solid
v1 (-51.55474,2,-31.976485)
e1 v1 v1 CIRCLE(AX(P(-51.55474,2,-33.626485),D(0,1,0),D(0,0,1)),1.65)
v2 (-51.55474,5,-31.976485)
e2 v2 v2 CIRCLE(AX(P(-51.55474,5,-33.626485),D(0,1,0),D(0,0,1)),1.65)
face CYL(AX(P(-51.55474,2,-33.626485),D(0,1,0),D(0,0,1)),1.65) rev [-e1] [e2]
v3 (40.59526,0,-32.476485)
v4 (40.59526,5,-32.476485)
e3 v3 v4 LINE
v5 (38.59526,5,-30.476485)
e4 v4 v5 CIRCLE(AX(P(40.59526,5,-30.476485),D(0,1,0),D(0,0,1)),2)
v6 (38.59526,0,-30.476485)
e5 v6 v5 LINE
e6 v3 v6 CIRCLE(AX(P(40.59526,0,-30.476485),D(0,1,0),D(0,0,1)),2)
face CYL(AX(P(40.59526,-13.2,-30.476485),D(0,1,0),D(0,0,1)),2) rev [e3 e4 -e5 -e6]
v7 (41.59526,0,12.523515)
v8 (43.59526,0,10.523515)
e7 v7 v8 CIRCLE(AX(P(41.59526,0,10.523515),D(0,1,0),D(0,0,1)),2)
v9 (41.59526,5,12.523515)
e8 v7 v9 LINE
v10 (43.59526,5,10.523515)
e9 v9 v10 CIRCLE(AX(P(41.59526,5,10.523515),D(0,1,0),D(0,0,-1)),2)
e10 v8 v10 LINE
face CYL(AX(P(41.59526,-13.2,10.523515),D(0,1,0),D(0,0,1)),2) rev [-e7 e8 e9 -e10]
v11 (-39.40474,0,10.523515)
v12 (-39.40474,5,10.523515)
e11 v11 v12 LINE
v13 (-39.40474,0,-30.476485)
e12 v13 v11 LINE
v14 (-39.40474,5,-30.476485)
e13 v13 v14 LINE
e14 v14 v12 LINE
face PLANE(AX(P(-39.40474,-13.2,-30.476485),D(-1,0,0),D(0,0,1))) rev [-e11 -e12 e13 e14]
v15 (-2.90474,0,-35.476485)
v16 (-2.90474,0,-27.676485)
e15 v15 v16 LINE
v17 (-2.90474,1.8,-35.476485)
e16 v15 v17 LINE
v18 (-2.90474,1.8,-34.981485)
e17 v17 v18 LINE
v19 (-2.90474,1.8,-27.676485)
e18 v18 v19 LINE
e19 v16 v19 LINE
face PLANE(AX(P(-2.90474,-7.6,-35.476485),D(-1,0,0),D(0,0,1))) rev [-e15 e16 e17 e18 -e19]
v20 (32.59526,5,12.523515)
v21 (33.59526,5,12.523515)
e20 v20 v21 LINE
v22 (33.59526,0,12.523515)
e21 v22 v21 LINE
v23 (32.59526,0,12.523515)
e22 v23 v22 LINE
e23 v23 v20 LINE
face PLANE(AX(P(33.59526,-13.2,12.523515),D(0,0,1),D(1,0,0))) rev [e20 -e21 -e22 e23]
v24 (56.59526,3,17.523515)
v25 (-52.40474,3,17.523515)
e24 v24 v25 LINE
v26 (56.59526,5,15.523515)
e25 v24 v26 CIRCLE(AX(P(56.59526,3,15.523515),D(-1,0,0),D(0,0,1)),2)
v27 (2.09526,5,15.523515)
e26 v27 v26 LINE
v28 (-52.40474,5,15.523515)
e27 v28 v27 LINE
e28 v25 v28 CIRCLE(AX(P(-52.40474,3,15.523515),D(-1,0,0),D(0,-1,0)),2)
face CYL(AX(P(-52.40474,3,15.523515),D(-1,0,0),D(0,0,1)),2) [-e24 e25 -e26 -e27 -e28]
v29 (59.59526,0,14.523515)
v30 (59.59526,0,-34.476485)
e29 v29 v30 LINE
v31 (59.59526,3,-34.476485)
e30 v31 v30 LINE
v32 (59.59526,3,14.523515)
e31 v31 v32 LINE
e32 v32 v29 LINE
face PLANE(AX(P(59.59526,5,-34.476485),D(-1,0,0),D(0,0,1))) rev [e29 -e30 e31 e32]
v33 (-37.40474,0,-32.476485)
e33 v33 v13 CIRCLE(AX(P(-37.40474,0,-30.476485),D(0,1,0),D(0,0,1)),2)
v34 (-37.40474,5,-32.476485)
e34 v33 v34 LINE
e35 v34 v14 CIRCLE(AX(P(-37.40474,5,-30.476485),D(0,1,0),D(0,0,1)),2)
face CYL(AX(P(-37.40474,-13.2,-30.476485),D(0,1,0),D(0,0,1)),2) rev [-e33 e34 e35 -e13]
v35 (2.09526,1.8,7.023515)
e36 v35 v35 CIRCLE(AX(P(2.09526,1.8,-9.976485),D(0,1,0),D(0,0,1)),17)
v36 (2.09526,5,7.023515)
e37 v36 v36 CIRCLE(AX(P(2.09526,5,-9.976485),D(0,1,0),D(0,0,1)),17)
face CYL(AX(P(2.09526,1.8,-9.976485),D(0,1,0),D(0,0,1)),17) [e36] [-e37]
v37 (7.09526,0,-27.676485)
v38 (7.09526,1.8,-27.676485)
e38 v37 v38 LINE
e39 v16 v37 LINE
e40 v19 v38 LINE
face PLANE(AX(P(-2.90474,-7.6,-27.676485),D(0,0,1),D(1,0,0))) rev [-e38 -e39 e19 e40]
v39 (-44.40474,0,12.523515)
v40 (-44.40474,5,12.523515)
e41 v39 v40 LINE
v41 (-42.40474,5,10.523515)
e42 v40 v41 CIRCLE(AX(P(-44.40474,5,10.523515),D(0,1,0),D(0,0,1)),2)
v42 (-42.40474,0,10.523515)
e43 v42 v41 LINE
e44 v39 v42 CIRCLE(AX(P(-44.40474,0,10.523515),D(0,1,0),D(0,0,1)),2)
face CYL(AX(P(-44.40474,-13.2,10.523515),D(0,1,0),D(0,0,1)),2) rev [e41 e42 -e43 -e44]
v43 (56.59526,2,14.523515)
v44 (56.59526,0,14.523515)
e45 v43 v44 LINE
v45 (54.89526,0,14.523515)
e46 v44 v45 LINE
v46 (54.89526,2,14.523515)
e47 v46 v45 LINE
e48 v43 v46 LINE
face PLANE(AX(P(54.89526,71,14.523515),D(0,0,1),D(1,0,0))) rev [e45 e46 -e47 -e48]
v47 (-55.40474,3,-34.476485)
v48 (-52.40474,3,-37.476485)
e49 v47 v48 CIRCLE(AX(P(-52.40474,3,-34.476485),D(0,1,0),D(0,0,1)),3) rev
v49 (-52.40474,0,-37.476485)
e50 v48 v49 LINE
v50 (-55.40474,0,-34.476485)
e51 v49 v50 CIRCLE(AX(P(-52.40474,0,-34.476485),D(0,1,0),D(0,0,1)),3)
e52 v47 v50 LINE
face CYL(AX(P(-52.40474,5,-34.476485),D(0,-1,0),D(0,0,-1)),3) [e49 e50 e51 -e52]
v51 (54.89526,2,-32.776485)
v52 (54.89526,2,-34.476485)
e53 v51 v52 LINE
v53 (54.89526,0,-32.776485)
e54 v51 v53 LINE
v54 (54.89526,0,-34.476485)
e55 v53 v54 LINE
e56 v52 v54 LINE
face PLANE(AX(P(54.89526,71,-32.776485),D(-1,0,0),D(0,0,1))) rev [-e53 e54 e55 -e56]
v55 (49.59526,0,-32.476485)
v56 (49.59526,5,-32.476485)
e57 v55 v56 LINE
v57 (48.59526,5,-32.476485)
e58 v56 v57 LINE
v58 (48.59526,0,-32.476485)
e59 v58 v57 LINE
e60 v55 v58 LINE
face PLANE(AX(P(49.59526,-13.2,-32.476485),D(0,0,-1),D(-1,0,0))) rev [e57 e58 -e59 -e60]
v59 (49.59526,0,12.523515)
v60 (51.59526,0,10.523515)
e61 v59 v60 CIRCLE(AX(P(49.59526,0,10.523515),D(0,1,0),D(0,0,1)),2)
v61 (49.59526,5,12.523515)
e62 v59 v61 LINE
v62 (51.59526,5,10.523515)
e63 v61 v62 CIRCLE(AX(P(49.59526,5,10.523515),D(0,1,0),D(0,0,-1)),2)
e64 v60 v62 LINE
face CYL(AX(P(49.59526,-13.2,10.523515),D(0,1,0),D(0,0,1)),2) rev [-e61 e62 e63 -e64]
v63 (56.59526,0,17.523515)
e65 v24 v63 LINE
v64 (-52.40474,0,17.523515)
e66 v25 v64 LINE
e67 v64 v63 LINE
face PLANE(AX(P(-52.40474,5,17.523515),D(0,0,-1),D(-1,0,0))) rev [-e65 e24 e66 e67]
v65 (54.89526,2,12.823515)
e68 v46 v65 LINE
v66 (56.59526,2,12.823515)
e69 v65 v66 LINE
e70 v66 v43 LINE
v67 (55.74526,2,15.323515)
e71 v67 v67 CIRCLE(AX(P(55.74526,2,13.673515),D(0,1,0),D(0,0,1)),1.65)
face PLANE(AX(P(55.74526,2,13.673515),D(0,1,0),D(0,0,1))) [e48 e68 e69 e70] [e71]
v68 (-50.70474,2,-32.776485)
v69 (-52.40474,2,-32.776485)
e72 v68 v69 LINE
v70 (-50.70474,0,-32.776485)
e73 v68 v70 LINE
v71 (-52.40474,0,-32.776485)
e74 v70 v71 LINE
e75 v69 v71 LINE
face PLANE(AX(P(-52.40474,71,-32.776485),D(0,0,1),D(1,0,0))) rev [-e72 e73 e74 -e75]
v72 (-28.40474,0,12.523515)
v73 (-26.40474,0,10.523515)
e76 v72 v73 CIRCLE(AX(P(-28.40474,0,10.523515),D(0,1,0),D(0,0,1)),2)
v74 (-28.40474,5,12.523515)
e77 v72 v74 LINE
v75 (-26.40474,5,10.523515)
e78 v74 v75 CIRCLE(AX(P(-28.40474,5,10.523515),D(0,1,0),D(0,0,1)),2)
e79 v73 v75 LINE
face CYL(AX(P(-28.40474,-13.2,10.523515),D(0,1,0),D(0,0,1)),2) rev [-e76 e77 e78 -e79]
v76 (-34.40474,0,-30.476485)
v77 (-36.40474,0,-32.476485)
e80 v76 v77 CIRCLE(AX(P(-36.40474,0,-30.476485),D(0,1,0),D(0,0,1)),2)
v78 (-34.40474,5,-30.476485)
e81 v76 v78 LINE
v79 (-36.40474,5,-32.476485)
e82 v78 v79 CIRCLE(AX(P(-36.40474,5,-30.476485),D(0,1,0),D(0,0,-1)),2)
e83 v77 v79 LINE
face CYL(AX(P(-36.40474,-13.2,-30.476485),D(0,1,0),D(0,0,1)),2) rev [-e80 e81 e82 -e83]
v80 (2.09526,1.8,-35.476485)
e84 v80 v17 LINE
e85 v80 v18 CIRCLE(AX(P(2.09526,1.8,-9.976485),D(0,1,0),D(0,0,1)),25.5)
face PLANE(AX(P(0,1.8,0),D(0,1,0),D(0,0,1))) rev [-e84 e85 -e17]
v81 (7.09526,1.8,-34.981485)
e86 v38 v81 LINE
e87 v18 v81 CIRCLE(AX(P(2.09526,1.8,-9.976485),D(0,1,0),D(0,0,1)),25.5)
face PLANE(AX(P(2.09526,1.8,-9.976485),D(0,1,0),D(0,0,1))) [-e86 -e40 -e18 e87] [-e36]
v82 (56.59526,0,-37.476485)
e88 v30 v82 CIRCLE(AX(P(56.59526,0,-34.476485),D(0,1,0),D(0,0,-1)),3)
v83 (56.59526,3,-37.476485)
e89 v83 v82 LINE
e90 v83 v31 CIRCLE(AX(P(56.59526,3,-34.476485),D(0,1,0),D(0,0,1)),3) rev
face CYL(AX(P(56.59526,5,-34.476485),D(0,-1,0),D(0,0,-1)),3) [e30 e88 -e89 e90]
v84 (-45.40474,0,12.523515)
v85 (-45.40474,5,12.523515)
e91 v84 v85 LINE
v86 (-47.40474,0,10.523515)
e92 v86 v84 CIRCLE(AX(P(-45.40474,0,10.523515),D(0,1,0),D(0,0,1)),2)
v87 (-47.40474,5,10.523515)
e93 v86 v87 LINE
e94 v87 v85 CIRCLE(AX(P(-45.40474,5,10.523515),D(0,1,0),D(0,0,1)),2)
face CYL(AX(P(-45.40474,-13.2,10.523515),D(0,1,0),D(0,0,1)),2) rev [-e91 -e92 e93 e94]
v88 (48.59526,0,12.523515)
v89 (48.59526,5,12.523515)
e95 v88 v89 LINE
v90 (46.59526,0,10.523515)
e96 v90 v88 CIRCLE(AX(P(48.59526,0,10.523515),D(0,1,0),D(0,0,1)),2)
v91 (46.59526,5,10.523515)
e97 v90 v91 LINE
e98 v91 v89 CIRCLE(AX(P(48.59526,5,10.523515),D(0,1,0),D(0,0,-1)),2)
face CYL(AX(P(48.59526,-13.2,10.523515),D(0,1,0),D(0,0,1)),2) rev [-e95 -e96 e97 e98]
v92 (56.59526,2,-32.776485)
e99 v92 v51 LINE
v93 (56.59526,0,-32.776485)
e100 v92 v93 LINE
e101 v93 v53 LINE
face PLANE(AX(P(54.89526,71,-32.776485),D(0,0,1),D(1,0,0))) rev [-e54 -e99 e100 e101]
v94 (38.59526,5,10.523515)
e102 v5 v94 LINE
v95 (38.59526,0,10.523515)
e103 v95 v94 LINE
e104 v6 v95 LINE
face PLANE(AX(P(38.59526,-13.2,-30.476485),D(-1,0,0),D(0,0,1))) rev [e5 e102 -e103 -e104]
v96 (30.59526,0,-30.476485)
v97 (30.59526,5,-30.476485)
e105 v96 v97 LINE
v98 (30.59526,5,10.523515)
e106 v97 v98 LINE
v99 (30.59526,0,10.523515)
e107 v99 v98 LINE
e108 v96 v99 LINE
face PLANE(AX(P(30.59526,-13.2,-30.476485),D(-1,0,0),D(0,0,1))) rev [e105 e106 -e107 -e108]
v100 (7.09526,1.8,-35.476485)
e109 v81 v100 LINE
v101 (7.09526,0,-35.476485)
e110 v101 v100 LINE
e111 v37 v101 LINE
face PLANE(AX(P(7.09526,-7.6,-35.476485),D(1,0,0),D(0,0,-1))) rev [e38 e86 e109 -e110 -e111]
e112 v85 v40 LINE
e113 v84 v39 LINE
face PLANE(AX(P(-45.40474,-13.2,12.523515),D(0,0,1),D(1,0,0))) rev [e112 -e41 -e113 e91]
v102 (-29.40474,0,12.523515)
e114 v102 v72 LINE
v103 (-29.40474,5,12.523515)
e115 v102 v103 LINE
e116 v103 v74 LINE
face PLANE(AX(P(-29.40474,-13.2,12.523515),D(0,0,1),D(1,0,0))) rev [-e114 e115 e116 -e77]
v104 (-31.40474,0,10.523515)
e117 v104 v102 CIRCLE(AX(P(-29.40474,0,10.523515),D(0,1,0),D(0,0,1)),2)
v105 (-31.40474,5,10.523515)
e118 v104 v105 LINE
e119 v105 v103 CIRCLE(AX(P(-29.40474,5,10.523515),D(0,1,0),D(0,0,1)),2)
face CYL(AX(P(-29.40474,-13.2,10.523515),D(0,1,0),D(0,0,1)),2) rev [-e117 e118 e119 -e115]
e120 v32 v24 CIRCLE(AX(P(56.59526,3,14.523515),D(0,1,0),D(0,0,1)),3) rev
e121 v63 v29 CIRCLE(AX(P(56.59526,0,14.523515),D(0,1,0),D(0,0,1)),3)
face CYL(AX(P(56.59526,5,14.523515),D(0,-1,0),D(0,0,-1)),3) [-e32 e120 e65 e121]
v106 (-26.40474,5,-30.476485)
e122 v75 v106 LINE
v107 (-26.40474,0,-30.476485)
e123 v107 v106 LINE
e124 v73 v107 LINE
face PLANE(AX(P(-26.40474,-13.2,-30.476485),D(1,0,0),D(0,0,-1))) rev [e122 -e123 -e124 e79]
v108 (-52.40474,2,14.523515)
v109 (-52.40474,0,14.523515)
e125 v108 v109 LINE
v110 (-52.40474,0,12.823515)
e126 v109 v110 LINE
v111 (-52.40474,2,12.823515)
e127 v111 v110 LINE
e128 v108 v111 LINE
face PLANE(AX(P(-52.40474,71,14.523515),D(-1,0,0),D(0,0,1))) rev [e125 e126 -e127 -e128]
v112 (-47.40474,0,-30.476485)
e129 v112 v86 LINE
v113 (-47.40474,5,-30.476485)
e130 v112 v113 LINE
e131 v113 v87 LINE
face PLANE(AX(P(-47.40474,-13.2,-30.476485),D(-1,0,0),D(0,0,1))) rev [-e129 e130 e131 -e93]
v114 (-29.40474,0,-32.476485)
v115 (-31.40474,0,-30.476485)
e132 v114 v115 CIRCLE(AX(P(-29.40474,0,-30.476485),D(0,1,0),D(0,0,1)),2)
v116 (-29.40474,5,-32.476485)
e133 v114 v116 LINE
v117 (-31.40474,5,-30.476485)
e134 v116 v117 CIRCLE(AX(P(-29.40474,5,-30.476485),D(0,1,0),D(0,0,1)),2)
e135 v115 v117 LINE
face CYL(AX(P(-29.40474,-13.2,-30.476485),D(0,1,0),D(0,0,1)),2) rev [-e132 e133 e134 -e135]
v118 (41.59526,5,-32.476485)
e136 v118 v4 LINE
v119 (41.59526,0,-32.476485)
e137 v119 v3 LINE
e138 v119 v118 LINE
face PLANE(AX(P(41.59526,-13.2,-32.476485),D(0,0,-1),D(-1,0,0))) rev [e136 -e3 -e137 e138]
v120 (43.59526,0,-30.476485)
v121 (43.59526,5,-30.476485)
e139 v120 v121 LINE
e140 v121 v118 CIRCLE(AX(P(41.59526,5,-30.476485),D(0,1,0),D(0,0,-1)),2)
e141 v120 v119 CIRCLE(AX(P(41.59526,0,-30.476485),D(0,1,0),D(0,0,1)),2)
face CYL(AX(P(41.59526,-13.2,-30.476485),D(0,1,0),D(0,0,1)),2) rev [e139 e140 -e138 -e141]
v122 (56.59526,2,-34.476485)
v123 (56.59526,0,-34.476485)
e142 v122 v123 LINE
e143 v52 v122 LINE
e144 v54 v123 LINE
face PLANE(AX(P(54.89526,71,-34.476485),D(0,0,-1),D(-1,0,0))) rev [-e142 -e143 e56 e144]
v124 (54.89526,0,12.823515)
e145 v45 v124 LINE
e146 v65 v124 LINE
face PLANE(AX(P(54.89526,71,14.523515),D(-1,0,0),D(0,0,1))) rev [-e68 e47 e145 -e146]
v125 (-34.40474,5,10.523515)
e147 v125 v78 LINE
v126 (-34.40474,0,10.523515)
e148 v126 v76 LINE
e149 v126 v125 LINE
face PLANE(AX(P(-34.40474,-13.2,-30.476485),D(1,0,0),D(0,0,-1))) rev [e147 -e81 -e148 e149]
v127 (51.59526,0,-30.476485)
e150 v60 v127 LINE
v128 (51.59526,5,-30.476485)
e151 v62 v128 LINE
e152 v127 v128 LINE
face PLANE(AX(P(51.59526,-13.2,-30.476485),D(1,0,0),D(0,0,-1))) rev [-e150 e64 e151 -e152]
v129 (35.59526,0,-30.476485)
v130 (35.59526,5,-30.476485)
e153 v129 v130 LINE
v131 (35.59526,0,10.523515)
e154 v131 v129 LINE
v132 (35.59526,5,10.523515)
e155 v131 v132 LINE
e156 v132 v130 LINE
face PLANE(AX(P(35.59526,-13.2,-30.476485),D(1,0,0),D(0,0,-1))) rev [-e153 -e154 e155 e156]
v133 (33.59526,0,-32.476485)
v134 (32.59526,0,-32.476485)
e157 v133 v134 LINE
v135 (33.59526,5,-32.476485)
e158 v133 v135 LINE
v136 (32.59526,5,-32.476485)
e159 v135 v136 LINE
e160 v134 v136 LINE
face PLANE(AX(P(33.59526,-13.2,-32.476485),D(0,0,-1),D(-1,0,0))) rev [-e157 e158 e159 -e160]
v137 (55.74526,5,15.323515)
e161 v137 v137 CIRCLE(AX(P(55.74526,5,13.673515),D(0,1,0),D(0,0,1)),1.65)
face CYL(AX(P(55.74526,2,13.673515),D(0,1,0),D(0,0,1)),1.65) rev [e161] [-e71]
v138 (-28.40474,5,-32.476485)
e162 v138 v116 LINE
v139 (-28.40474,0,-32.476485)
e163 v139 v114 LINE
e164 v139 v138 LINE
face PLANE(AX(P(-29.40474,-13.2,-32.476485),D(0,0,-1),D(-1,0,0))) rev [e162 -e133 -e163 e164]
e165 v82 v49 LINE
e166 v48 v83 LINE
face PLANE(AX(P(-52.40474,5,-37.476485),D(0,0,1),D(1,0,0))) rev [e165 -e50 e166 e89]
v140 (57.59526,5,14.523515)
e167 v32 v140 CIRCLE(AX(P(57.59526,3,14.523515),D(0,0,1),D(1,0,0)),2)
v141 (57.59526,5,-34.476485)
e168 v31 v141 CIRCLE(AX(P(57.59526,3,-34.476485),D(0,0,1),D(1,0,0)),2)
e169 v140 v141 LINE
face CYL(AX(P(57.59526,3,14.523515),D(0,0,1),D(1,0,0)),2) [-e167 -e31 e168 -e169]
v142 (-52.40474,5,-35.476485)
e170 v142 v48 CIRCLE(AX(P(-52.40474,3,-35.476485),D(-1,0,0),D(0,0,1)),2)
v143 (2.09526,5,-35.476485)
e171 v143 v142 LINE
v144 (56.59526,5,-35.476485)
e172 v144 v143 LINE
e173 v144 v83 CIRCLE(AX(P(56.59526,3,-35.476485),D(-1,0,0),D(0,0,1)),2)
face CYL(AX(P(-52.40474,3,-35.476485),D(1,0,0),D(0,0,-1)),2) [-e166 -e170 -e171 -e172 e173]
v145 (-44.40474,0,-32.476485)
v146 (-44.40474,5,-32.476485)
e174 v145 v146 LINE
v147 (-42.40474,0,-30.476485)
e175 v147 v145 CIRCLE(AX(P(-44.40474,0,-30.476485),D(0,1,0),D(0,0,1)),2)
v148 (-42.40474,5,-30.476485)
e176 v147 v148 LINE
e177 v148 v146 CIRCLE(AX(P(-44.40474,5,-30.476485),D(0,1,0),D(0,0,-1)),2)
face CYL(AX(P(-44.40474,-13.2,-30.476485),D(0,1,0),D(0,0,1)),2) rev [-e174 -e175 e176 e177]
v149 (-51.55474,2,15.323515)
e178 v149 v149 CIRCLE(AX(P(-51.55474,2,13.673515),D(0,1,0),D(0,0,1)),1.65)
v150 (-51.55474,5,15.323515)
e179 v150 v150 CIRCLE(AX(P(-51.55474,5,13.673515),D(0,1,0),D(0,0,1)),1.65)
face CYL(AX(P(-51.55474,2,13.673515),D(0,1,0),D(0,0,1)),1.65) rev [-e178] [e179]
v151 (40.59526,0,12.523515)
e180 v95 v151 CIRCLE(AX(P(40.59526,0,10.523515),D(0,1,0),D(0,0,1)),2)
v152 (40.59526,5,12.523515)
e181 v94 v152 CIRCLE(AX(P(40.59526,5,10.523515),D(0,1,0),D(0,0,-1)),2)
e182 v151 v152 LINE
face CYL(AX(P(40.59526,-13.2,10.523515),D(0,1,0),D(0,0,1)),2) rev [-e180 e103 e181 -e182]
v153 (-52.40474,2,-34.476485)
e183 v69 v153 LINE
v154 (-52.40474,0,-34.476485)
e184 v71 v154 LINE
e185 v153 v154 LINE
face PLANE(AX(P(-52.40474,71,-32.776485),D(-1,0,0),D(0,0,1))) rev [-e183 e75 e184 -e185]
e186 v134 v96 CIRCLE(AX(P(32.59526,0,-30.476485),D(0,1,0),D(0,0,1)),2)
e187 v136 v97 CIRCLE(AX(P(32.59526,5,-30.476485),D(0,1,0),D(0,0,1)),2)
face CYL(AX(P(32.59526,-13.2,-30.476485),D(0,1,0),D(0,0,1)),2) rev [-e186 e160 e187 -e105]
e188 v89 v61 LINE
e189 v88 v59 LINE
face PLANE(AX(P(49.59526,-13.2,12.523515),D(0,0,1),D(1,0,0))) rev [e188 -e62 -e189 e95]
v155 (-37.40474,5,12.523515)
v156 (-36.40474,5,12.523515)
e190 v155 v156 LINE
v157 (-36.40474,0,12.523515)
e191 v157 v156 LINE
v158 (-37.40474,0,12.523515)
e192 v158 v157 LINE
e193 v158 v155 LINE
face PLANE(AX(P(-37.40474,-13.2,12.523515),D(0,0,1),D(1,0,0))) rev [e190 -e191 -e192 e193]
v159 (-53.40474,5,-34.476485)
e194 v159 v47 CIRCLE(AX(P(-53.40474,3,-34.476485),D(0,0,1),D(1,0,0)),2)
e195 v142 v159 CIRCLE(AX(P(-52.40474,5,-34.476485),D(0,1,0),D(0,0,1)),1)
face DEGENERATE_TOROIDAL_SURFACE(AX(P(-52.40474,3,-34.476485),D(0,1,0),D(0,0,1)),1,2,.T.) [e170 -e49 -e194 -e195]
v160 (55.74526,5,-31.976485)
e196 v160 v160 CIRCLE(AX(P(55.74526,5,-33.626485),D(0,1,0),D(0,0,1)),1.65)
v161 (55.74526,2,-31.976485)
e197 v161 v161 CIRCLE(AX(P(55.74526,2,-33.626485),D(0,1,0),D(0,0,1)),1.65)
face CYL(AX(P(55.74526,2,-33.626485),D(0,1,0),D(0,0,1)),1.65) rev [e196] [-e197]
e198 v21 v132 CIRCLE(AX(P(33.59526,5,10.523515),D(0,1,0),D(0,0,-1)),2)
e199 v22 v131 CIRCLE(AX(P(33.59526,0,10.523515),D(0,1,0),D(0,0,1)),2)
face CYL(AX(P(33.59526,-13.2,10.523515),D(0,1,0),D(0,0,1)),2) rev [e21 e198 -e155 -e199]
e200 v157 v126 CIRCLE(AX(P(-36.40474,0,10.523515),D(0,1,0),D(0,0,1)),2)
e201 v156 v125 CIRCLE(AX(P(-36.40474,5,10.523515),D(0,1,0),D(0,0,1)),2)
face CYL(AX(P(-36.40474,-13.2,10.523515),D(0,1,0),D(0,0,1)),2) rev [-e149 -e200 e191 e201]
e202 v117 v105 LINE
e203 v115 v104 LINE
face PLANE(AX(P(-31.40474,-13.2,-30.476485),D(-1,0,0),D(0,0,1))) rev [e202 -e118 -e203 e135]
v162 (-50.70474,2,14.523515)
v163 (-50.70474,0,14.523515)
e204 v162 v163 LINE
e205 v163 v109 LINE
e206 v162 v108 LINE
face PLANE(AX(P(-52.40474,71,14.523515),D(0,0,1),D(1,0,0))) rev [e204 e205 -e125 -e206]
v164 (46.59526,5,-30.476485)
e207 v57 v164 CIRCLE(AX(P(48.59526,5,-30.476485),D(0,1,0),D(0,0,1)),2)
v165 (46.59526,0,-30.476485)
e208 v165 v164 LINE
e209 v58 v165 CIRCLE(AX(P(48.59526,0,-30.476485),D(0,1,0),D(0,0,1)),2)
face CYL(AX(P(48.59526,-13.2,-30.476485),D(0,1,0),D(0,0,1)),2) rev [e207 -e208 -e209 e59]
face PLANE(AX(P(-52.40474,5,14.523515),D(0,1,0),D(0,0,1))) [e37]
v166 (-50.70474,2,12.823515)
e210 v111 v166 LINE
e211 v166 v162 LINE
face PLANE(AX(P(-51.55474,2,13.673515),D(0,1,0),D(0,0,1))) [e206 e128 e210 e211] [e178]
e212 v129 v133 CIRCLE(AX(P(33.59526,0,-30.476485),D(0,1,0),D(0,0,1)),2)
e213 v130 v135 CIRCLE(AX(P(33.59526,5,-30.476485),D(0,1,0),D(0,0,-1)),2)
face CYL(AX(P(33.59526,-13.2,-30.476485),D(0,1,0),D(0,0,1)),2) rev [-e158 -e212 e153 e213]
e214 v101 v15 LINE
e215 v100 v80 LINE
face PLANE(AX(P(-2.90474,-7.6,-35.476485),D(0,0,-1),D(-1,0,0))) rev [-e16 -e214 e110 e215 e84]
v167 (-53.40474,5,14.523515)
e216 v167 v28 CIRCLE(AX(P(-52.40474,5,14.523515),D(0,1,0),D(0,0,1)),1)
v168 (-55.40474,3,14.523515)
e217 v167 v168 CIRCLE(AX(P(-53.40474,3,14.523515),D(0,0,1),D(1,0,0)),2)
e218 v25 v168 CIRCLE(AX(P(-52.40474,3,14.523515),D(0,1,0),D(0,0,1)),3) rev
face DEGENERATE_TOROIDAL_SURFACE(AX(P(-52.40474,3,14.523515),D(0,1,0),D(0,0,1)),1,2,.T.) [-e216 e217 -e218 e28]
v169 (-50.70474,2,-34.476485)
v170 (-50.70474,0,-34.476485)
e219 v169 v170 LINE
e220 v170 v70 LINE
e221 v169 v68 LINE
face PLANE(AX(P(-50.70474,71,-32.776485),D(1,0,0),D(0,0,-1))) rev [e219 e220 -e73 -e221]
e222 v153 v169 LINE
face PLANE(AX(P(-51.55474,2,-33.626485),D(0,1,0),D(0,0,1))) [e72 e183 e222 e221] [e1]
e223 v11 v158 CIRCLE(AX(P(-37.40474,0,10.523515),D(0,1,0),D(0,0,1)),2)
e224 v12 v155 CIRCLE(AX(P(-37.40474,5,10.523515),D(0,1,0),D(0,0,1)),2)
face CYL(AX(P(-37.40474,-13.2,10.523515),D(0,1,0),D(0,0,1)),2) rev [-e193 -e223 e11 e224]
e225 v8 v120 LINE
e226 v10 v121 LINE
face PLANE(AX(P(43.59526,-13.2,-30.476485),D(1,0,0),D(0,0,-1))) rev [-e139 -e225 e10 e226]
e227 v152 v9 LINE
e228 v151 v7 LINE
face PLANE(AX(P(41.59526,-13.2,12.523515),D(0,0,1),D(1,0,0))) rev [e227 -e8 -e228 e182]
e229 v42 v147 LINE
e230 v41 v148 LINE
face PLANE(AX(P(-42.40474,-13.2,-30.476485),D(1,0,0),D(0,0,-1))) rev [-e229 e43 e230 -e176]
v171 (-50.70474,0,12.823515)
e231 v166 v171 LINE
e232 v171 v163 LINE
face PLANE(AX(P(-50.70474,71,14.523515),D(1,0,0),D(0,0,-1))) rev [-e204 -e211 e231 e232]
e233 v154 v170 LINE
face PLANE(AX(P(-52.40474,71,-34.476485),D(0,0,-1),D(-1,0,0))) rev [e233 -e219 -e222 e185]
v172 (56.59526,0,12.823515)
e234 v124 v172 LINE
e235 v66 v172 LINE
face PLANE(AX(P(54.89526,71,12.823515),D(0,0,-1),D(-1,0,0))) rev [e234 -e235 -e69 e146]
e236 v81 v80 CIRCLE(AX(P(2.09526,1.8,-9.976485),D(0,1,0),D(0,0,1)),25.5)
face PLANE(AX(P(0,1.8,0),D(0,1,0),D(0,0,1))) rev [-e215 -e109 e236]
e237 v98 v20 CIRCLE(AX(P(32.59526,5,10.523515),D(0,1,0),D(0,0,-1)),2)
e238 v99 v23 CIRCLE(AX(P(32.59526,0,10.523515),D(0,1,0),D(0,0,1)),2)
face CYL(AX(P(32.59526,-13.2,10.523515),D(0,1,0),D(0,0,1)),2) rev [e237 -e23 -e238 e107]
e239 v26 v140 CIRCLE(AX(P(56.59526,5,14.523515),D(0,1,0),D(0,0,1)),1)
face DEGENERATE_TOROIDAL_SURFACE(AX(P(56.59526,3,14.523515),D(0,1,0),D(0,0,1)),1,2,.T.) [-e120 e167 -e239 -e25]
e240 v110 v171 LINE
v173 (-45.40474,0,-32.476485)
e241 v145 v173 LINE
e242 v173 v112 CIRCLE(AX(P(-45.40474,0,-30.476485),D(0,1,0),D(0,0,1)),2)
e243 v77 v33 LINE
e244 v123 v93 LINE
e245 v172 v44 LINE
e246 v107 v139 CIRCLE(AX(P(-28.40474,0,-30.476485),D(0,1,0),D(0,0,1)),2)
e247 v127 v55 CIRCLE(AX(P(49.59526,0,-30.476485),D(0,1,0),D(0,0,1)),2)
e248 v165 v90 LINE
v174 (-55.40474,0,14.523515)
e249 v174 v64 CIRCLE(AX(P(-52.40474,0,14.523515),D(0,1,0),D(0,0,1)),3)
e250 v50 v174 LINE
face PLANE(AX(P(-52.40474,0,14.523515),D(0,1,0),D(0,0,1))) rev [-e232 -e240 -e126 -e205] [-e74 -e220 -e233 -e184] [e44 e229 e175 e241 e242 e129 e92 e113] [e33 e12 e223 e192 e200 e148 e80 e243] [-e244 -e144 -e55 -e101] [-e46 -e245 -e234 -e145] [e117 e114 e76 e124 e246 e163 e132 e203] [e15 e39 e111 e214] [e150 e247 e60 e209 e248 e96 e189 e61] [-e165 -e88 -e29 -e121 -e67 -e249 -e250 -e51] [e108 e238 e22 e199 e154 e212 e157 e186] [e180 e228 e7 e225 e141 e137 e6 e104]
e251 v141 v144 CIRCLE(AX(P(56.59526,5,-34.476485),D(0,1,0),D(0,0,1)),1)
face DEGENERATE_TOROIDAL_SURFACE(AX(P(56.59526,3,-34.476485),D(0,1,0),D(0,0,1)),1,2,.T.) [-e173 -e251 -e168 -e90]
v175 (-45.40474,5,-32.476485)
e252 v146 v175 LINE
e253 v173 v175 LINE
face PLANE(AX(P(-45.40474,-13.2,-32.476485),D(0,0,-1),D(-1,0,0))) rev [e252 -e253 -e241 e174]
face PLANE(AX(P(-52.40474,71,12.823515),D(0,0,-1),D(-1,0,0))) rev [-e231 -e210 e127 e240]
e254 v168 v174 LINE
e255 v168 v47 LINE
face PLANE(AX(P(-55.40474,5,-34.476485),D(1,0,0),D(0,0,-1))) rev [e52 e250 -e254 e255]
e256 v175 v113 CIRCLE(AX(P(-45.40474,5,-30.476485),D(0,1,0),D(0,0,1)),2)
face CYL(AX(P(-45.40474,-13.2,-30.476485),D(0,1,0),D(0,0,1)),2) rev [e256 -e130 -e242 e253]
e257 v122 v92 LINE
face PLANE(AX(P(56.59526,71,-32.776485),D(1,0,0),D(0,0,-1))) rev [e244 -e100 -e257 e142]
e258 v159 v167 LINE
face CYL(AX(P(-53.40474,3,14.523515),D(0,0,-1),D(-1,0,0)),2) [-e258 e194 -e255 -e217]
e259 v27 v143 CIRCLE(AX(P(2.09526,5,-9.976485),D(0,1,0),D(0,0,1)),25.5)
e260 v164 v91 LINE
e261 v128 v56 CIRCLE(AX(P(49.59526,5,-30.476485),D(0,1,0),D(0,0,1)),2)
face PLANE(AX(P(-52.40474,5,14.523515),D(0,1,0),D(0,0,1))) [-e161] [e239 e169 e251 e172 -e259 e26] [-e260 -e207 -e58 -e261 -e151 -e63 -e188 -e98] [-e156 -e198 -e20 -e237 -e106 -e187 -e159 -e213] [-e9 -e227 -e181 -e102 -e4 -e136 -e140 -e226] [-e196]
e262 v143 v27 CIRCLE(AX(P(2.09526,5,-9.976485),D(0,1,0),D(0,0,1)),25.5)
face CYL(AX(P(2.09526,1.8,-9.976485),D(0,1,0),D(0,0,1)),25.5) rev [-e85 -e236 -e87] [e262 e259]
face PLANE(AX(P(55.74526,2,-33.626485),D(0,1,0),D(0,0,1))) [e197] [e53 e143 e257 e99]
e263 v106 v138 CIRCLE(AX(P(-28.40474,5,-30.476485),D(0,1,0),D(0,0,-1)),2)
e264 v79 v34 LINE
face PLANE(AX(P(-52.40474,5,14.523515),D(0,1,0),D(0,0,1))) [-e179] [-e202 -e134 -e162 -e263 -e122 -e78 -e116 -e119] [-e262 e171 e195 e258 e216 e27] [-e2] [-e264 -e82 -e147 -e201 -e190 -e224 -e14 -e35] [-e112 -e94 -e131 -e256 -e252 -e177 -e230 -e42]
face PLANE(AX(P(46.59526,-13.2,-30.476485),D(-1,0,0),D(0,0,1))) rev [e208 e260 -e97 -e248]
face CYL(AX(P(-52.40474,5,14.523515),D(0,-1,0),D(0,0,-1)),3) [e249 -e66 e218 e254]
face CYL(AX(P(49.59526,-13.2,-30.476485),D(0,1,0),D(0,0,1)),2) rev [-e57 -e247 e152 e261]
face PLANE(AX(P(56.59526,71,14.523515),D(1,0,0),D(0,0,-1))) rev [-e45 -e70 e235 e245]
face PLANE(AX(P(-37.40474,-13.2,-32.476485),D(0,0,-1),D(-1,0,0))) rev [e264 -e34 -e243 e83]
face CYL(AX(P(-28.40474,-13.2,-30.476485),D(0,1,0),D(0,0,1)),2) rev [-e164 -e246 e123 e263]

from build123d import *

# Parameters (mm, degrees)
EXTRUDE_1_DEPTH     = 5
SKETCH_2_R          = 25.5
SKETCH_2_R_2        = 17
CUT_EXTRUDE_1_DEPTH = 3.2
CUT_EXTRUDE_2_DEPTH = 18.2
FILLET_1_R          = 2
SKETCH_4_W          = 1.7
SKETCH_4_H          = 1.7
CUT_EXTRUDE_3_DEPTH = 71
SKETCH_5_R          = 1.65
CUT_EXTRUDE_4_DEPTH = 3
SKETCH_6_W          = 10
SKETCH_6_H          = 7.8
CUT_EXTRUDE_5_DEPTH = 9.4


with BuildPart() as part:
    # Эскиз1 → Бобышка-Вытянуть1 (new body)
    with BuildSketch(Plane(origin=(0, 0, 0), x_dir=(1, 0, 0), z_dir=(0, 1, 0))):
        with BuildLine():
            Line((-52.404740413, 37.47648532), (56.595259587, 37.47648532))
            ThreePointArc((56.595259587, 37.47648532), (58.716579931, 36.597805664), (59.595259587, 34.47648532))
            Line((59.595259587, 34.47648532), (59.595259587, -14.52351468))
            ThreePointArc((59.595259587, -14.52351468), (58.716579931, -16.644835023), (56.595259587, -17.52351468))
            Line((56.595259587, -17.52351468), (-52.404740413, -17.52351468))
            ThreePointArc((-52.404740413, -17.52351468), (-54.526060756, -16.644835023), (-55.404740413, -14.52351468))
            Line((-55.404740413, -14.52351468), (-55.404740413, 34.47648532))
            ThreePointArc((-55.404740413, 34.47648532), (-54.526060756, 36.597805664), (-52.404740413, 37.47648532))
        make_face()
    extrude(amount=EXTRUDE_1_DEPTH)

    # Эскиз2 → Вырез-Вытянуть1 (cut)
    with BuildSketch(Plane(origin=(0, 5, 0), x_dir=(1, 0, 0), z_dir=(0, 1, 0))):
        with Locations(Location((2.095259587, 9.97648532, 0), (0, 0, 270))):
            Circle(SKETCH_2_R)
        with Locations(Location((2.095259587, 9.97648532, 0), (0, 0, 270))):
            Circle(SKETCH_2_R_2, mode=Mode.SUBTRACT)
    extrude(amount=-CUT_EXTRUDE_1_DEPTH, mode=Mode.SUBTRACT)

    # Эскиз3 → Вырез-Вытянуть2 (cut)
    with BuildSketch(Plane(origin=(0, 5, 0), x_dir=(1, 0, 0), z_dir=(0, 1, 0))):
        with BuildLine():
            Line((-45.404740413, 32.47648532), (-44.404740413, 32.47648532))
            ThreePointArc((-44.404740413, 32.47648532), (-42.99052685, 31.890698883), (-42.404740413, 30.47648532))
            Line((-42.404740413, 30.47648532), (-42.404740413, -10.52351468))
            ThreePointArc((-42.404740413, -10.52351468), (-42.99052685, -11.937728242), (-44.404740413, -12.52351468))
            Line((-44.404740413, -12.52351468), (-45.404740413, -12.52351468))
            ThreePointArc((-45.404740413, -12.52351468), (-46.818953975, -11.937728242), (-47.404740413, -10.52351468))
            Line((-47.404740413, -10.52351468), (-47.404740413, 30.47648532))
            ThreePointArc((-47.404740413, 30.47648532), (-46.818953975, 31.890698883), (-45.404740413, 32.47648532))
        make_face()
        with BuildLine():
            Line((-37.404740413, 32.47648532), (-36.404740413, 32.47648532))
            ThreePointArc((-36.404740413, 32.47648532), (-34.99052685, 31.890698883), (-34.404740413, 30.47648532))
            Line((-34.404740413, 30.47648532), (-34.404740413, -10.52351468))
            ThreePointArc((-34.404740413, -10.52351468), (-34.99052685, -11.937728242), (-36.404740413, -12.52351468))
            Line((-36.404740413, -12.52351468), (-37.404740413, -12.52351468))
            ThreePointArc((-37.404740413, -12.52351468), (-38.818953975, -11.937728242), (-39.404740413, -10.52351468))
            Line((-39.404740413, -10.52351468), (-39.404740413, 30.47648532))
            ThreePointArc((-39.404740413, 30.47648532), (-38.818953975, 31.890698883), (-37.404740413, 32.47648532))
        make_face()
        with BuildLine():
            Line((-29.404740413, 32.47648532), (-28.404740413, 32.47648532))
            ThreePointArc((-28.404740413, 32.47648532), (-26.99052685, 31.890698883), (-26.404740413, 30.47648532))
            Line((-26.404740413, 30.47648532), (-26.404740413, -10.52351468))
            ThreePointArc((-26.404740413, -10.52351468), (-26.99052685, -11.937728242), (-28.404740413, -12.52351468))
            Line((-28.404740413, -12.52351468), (-29.404740413, -12.52351468))
            ThreePointArc((-29.404740413, -12.52351468), (-30.818953975, -11.937728242), (-31.404740413, -10.52351468))
            Line((-31.404740413, -10.52351468), (-31.404740413, 30.47648532))
            ThreePointArc((-31.404740413, 30.47648532), (-30.818953975, 31.890698883), (-29.404740413, 32.47648532))
        make_face()
        with BuildLine():
            Line((49.595259587, 32.47648532), (48.595259587, 32.47648532))
            ThreePointArc((48.595259587, 32.47648532), (47.181046025, 31.890698883), (46.595259587, 30.47648532))
            Line((46.595259587, 30.47648532), (46.595259587, -10.52351468))
            ThreePointArc((46.595259587, -10.52351468), (47.181046025, -11.937728242), (48.595259587, -12.52351468))
            Line((48.595259587, -12.52351468), (49.595259587, -12.52351468))
            ThreePointArc((49.595259587, -12.52351468), (51.00947315, -11.937728242), (51.595259587, -10.52351468))
            Line((51.595259587, -10.52351468), (51.595259587, 30.47648532))
            ThreePointArc((51.595259587, 30.47648532), (51.00947315, 31.890698883), (49.595259587, 32.47648532))
        make_face()
        with BuildLine():
            Line((41.595259587, 32.47648532), (40.595259587, 32.47648532))
            ThreePointArc((40.595259587, 32.47648532), (39.181046025, 31.890698883), (38.595259587, 30.47648532))
            Line((38.595259587, 30.47648532), (38.595259587, -10.52351468))
            ThreePointArc((38.595259587, -10.52351468), (39.181046025, -11.937728242), (40.595259587, -12.52351468))
            Line((40.595259587, -12.52351468), (41.595259587, -12.52351468))
            ThreePointArc((41.595259587, -12.52351468), (43.00947315, -11.937728242), (43.595259587, -10.52351468))
            Line((43.595259587, -10.52351468), (43.595259587, 30.47648532))
            ThreePointArc((43.595259587, 30.47648532), (43.00947315, 31.890698883), (41.595259587, 32.47648532))
        make_face()
        with BuildLine():
            Line((33.595259587, 32.47648532), (32.595259587, 32.47648532))
            ThreePointArc((32.595259587, 32.47648532), (31.181046025, 31.890698883), (30.595259587, 30.47648532))
            Line((30.595259587, 30.47648532), (30.595259587, -10.52351468))
            ThreePointArc((30.595259587, -10.52351468), (31.181046025, -11.937728242), (32.595259587, -12.52351468))
            Line((32.595259587, -12.52351468), (33.595259587, -12.52351468))
            ThreePointArc((33.595259587, -12.52351468), (35.00947315, -11.937728242), (35.595259587, -10.52351468))
            Line((35.595259587, -10.52351468), (35.595259587, 30.47648532))
            ThreePointArc((35.595259587, 30.47648532), (35.00947315, 31.890698883), (33.595259587, 32.47648532))
        make_face()
    extrude(amount=-CUT_EXTRUDE_2_DEPTH, mode=Mode.SUBTRACT)

    # Скругление1
    fillet_1_edges = [part.edges().sort_by_distance(p)[0] for p in [
        (58.716579931, 5, 16.644835023),
        (59.595259587, 5, -9.97648532),
        (58.716579931, 5, -36.597805664),
        (2.095259587, 5, -37.47648532),
        (-54.526060756, 5, -36.597805664),
        (-55.404740413, 5, -9.97648532),
        (-54.526060756, 5, 16.644835023),
        (2.095259587, 5, 17.52351468),
    ]]
    fillet(fillet_1_edges, radius=FILLET_1_R - 0.0001)  # a hair under: the kernel refuses the full size

    # Эскиз4 → Вырез-Вытянуть3 (cut)
    with BuildSketch(Plane.XZ):
        with Locations((-51.554740413, 13.67351468)):
            Rectangle(SKETCH_4_W, SKETCH_4_H)
        with Locations((-51.554740413, -33.62648532)):
            Rectangle(SKETCH_4_W, SKETCH_4_H)
        with Locations((55.745259587, -33.62648532)):
            Rectangle(SKETCH_4_W, SKETCH_4_H)
        with Locations((55.745259587, 13.67351468)):
            Rectangle(SKETCH_4_W, SKETCH_4_H)
    extrude(amount=-CUT_EXTRUDE_3_DEPTH, mode=Mode.SUBTRACT)

    # Эскиз5 → Вырез-Вытянуть4 (cut)
    with BuildSketch(Plane(origin=(0, 5, 0), x_dir=(1, 0, 0), z_dir=(0, 1, 0))):
        with Locations(Location((-51.554740413, 33.62648532, 0), (0, 0, 270))):
            Circle(SKETCH_5_R)
        with Locations(Location((-51.554740413, -13.67351468, 0), (0, 0, 270))):
            Circle(SKETCH_5_R)
        with Locations(Location((55.745259587, 33.62648532, 0), (0, 0, 270))):
            Circle(SKETCH_5_R)
        with Locations(Location((55.745259587, -13.67351468, 0), (0, 0, 270))):
            Circle(SKETCH_5_R)
    extrude(amount=-CUT_EXTRUDE_4_DEPTH, mode=Mode.SUBTRACT)

    # Эскиз6 → Вырез-Вытянуть5 (cut)
    with BuildSketch(Plane(origin=(0, 1.8, 0), x_dir=(1, 0, 0), z_dir=(0, 1, 0))):
        with Locations((2.095259587, 31.57648532)):
            Rectangle(SKETCH_6_W, SKETCH_6_H)
    extrude(amount=-CUT_EXTRUDE_5_DEPTH, mode=Mode.SUBTRACT)


solid = part.part
